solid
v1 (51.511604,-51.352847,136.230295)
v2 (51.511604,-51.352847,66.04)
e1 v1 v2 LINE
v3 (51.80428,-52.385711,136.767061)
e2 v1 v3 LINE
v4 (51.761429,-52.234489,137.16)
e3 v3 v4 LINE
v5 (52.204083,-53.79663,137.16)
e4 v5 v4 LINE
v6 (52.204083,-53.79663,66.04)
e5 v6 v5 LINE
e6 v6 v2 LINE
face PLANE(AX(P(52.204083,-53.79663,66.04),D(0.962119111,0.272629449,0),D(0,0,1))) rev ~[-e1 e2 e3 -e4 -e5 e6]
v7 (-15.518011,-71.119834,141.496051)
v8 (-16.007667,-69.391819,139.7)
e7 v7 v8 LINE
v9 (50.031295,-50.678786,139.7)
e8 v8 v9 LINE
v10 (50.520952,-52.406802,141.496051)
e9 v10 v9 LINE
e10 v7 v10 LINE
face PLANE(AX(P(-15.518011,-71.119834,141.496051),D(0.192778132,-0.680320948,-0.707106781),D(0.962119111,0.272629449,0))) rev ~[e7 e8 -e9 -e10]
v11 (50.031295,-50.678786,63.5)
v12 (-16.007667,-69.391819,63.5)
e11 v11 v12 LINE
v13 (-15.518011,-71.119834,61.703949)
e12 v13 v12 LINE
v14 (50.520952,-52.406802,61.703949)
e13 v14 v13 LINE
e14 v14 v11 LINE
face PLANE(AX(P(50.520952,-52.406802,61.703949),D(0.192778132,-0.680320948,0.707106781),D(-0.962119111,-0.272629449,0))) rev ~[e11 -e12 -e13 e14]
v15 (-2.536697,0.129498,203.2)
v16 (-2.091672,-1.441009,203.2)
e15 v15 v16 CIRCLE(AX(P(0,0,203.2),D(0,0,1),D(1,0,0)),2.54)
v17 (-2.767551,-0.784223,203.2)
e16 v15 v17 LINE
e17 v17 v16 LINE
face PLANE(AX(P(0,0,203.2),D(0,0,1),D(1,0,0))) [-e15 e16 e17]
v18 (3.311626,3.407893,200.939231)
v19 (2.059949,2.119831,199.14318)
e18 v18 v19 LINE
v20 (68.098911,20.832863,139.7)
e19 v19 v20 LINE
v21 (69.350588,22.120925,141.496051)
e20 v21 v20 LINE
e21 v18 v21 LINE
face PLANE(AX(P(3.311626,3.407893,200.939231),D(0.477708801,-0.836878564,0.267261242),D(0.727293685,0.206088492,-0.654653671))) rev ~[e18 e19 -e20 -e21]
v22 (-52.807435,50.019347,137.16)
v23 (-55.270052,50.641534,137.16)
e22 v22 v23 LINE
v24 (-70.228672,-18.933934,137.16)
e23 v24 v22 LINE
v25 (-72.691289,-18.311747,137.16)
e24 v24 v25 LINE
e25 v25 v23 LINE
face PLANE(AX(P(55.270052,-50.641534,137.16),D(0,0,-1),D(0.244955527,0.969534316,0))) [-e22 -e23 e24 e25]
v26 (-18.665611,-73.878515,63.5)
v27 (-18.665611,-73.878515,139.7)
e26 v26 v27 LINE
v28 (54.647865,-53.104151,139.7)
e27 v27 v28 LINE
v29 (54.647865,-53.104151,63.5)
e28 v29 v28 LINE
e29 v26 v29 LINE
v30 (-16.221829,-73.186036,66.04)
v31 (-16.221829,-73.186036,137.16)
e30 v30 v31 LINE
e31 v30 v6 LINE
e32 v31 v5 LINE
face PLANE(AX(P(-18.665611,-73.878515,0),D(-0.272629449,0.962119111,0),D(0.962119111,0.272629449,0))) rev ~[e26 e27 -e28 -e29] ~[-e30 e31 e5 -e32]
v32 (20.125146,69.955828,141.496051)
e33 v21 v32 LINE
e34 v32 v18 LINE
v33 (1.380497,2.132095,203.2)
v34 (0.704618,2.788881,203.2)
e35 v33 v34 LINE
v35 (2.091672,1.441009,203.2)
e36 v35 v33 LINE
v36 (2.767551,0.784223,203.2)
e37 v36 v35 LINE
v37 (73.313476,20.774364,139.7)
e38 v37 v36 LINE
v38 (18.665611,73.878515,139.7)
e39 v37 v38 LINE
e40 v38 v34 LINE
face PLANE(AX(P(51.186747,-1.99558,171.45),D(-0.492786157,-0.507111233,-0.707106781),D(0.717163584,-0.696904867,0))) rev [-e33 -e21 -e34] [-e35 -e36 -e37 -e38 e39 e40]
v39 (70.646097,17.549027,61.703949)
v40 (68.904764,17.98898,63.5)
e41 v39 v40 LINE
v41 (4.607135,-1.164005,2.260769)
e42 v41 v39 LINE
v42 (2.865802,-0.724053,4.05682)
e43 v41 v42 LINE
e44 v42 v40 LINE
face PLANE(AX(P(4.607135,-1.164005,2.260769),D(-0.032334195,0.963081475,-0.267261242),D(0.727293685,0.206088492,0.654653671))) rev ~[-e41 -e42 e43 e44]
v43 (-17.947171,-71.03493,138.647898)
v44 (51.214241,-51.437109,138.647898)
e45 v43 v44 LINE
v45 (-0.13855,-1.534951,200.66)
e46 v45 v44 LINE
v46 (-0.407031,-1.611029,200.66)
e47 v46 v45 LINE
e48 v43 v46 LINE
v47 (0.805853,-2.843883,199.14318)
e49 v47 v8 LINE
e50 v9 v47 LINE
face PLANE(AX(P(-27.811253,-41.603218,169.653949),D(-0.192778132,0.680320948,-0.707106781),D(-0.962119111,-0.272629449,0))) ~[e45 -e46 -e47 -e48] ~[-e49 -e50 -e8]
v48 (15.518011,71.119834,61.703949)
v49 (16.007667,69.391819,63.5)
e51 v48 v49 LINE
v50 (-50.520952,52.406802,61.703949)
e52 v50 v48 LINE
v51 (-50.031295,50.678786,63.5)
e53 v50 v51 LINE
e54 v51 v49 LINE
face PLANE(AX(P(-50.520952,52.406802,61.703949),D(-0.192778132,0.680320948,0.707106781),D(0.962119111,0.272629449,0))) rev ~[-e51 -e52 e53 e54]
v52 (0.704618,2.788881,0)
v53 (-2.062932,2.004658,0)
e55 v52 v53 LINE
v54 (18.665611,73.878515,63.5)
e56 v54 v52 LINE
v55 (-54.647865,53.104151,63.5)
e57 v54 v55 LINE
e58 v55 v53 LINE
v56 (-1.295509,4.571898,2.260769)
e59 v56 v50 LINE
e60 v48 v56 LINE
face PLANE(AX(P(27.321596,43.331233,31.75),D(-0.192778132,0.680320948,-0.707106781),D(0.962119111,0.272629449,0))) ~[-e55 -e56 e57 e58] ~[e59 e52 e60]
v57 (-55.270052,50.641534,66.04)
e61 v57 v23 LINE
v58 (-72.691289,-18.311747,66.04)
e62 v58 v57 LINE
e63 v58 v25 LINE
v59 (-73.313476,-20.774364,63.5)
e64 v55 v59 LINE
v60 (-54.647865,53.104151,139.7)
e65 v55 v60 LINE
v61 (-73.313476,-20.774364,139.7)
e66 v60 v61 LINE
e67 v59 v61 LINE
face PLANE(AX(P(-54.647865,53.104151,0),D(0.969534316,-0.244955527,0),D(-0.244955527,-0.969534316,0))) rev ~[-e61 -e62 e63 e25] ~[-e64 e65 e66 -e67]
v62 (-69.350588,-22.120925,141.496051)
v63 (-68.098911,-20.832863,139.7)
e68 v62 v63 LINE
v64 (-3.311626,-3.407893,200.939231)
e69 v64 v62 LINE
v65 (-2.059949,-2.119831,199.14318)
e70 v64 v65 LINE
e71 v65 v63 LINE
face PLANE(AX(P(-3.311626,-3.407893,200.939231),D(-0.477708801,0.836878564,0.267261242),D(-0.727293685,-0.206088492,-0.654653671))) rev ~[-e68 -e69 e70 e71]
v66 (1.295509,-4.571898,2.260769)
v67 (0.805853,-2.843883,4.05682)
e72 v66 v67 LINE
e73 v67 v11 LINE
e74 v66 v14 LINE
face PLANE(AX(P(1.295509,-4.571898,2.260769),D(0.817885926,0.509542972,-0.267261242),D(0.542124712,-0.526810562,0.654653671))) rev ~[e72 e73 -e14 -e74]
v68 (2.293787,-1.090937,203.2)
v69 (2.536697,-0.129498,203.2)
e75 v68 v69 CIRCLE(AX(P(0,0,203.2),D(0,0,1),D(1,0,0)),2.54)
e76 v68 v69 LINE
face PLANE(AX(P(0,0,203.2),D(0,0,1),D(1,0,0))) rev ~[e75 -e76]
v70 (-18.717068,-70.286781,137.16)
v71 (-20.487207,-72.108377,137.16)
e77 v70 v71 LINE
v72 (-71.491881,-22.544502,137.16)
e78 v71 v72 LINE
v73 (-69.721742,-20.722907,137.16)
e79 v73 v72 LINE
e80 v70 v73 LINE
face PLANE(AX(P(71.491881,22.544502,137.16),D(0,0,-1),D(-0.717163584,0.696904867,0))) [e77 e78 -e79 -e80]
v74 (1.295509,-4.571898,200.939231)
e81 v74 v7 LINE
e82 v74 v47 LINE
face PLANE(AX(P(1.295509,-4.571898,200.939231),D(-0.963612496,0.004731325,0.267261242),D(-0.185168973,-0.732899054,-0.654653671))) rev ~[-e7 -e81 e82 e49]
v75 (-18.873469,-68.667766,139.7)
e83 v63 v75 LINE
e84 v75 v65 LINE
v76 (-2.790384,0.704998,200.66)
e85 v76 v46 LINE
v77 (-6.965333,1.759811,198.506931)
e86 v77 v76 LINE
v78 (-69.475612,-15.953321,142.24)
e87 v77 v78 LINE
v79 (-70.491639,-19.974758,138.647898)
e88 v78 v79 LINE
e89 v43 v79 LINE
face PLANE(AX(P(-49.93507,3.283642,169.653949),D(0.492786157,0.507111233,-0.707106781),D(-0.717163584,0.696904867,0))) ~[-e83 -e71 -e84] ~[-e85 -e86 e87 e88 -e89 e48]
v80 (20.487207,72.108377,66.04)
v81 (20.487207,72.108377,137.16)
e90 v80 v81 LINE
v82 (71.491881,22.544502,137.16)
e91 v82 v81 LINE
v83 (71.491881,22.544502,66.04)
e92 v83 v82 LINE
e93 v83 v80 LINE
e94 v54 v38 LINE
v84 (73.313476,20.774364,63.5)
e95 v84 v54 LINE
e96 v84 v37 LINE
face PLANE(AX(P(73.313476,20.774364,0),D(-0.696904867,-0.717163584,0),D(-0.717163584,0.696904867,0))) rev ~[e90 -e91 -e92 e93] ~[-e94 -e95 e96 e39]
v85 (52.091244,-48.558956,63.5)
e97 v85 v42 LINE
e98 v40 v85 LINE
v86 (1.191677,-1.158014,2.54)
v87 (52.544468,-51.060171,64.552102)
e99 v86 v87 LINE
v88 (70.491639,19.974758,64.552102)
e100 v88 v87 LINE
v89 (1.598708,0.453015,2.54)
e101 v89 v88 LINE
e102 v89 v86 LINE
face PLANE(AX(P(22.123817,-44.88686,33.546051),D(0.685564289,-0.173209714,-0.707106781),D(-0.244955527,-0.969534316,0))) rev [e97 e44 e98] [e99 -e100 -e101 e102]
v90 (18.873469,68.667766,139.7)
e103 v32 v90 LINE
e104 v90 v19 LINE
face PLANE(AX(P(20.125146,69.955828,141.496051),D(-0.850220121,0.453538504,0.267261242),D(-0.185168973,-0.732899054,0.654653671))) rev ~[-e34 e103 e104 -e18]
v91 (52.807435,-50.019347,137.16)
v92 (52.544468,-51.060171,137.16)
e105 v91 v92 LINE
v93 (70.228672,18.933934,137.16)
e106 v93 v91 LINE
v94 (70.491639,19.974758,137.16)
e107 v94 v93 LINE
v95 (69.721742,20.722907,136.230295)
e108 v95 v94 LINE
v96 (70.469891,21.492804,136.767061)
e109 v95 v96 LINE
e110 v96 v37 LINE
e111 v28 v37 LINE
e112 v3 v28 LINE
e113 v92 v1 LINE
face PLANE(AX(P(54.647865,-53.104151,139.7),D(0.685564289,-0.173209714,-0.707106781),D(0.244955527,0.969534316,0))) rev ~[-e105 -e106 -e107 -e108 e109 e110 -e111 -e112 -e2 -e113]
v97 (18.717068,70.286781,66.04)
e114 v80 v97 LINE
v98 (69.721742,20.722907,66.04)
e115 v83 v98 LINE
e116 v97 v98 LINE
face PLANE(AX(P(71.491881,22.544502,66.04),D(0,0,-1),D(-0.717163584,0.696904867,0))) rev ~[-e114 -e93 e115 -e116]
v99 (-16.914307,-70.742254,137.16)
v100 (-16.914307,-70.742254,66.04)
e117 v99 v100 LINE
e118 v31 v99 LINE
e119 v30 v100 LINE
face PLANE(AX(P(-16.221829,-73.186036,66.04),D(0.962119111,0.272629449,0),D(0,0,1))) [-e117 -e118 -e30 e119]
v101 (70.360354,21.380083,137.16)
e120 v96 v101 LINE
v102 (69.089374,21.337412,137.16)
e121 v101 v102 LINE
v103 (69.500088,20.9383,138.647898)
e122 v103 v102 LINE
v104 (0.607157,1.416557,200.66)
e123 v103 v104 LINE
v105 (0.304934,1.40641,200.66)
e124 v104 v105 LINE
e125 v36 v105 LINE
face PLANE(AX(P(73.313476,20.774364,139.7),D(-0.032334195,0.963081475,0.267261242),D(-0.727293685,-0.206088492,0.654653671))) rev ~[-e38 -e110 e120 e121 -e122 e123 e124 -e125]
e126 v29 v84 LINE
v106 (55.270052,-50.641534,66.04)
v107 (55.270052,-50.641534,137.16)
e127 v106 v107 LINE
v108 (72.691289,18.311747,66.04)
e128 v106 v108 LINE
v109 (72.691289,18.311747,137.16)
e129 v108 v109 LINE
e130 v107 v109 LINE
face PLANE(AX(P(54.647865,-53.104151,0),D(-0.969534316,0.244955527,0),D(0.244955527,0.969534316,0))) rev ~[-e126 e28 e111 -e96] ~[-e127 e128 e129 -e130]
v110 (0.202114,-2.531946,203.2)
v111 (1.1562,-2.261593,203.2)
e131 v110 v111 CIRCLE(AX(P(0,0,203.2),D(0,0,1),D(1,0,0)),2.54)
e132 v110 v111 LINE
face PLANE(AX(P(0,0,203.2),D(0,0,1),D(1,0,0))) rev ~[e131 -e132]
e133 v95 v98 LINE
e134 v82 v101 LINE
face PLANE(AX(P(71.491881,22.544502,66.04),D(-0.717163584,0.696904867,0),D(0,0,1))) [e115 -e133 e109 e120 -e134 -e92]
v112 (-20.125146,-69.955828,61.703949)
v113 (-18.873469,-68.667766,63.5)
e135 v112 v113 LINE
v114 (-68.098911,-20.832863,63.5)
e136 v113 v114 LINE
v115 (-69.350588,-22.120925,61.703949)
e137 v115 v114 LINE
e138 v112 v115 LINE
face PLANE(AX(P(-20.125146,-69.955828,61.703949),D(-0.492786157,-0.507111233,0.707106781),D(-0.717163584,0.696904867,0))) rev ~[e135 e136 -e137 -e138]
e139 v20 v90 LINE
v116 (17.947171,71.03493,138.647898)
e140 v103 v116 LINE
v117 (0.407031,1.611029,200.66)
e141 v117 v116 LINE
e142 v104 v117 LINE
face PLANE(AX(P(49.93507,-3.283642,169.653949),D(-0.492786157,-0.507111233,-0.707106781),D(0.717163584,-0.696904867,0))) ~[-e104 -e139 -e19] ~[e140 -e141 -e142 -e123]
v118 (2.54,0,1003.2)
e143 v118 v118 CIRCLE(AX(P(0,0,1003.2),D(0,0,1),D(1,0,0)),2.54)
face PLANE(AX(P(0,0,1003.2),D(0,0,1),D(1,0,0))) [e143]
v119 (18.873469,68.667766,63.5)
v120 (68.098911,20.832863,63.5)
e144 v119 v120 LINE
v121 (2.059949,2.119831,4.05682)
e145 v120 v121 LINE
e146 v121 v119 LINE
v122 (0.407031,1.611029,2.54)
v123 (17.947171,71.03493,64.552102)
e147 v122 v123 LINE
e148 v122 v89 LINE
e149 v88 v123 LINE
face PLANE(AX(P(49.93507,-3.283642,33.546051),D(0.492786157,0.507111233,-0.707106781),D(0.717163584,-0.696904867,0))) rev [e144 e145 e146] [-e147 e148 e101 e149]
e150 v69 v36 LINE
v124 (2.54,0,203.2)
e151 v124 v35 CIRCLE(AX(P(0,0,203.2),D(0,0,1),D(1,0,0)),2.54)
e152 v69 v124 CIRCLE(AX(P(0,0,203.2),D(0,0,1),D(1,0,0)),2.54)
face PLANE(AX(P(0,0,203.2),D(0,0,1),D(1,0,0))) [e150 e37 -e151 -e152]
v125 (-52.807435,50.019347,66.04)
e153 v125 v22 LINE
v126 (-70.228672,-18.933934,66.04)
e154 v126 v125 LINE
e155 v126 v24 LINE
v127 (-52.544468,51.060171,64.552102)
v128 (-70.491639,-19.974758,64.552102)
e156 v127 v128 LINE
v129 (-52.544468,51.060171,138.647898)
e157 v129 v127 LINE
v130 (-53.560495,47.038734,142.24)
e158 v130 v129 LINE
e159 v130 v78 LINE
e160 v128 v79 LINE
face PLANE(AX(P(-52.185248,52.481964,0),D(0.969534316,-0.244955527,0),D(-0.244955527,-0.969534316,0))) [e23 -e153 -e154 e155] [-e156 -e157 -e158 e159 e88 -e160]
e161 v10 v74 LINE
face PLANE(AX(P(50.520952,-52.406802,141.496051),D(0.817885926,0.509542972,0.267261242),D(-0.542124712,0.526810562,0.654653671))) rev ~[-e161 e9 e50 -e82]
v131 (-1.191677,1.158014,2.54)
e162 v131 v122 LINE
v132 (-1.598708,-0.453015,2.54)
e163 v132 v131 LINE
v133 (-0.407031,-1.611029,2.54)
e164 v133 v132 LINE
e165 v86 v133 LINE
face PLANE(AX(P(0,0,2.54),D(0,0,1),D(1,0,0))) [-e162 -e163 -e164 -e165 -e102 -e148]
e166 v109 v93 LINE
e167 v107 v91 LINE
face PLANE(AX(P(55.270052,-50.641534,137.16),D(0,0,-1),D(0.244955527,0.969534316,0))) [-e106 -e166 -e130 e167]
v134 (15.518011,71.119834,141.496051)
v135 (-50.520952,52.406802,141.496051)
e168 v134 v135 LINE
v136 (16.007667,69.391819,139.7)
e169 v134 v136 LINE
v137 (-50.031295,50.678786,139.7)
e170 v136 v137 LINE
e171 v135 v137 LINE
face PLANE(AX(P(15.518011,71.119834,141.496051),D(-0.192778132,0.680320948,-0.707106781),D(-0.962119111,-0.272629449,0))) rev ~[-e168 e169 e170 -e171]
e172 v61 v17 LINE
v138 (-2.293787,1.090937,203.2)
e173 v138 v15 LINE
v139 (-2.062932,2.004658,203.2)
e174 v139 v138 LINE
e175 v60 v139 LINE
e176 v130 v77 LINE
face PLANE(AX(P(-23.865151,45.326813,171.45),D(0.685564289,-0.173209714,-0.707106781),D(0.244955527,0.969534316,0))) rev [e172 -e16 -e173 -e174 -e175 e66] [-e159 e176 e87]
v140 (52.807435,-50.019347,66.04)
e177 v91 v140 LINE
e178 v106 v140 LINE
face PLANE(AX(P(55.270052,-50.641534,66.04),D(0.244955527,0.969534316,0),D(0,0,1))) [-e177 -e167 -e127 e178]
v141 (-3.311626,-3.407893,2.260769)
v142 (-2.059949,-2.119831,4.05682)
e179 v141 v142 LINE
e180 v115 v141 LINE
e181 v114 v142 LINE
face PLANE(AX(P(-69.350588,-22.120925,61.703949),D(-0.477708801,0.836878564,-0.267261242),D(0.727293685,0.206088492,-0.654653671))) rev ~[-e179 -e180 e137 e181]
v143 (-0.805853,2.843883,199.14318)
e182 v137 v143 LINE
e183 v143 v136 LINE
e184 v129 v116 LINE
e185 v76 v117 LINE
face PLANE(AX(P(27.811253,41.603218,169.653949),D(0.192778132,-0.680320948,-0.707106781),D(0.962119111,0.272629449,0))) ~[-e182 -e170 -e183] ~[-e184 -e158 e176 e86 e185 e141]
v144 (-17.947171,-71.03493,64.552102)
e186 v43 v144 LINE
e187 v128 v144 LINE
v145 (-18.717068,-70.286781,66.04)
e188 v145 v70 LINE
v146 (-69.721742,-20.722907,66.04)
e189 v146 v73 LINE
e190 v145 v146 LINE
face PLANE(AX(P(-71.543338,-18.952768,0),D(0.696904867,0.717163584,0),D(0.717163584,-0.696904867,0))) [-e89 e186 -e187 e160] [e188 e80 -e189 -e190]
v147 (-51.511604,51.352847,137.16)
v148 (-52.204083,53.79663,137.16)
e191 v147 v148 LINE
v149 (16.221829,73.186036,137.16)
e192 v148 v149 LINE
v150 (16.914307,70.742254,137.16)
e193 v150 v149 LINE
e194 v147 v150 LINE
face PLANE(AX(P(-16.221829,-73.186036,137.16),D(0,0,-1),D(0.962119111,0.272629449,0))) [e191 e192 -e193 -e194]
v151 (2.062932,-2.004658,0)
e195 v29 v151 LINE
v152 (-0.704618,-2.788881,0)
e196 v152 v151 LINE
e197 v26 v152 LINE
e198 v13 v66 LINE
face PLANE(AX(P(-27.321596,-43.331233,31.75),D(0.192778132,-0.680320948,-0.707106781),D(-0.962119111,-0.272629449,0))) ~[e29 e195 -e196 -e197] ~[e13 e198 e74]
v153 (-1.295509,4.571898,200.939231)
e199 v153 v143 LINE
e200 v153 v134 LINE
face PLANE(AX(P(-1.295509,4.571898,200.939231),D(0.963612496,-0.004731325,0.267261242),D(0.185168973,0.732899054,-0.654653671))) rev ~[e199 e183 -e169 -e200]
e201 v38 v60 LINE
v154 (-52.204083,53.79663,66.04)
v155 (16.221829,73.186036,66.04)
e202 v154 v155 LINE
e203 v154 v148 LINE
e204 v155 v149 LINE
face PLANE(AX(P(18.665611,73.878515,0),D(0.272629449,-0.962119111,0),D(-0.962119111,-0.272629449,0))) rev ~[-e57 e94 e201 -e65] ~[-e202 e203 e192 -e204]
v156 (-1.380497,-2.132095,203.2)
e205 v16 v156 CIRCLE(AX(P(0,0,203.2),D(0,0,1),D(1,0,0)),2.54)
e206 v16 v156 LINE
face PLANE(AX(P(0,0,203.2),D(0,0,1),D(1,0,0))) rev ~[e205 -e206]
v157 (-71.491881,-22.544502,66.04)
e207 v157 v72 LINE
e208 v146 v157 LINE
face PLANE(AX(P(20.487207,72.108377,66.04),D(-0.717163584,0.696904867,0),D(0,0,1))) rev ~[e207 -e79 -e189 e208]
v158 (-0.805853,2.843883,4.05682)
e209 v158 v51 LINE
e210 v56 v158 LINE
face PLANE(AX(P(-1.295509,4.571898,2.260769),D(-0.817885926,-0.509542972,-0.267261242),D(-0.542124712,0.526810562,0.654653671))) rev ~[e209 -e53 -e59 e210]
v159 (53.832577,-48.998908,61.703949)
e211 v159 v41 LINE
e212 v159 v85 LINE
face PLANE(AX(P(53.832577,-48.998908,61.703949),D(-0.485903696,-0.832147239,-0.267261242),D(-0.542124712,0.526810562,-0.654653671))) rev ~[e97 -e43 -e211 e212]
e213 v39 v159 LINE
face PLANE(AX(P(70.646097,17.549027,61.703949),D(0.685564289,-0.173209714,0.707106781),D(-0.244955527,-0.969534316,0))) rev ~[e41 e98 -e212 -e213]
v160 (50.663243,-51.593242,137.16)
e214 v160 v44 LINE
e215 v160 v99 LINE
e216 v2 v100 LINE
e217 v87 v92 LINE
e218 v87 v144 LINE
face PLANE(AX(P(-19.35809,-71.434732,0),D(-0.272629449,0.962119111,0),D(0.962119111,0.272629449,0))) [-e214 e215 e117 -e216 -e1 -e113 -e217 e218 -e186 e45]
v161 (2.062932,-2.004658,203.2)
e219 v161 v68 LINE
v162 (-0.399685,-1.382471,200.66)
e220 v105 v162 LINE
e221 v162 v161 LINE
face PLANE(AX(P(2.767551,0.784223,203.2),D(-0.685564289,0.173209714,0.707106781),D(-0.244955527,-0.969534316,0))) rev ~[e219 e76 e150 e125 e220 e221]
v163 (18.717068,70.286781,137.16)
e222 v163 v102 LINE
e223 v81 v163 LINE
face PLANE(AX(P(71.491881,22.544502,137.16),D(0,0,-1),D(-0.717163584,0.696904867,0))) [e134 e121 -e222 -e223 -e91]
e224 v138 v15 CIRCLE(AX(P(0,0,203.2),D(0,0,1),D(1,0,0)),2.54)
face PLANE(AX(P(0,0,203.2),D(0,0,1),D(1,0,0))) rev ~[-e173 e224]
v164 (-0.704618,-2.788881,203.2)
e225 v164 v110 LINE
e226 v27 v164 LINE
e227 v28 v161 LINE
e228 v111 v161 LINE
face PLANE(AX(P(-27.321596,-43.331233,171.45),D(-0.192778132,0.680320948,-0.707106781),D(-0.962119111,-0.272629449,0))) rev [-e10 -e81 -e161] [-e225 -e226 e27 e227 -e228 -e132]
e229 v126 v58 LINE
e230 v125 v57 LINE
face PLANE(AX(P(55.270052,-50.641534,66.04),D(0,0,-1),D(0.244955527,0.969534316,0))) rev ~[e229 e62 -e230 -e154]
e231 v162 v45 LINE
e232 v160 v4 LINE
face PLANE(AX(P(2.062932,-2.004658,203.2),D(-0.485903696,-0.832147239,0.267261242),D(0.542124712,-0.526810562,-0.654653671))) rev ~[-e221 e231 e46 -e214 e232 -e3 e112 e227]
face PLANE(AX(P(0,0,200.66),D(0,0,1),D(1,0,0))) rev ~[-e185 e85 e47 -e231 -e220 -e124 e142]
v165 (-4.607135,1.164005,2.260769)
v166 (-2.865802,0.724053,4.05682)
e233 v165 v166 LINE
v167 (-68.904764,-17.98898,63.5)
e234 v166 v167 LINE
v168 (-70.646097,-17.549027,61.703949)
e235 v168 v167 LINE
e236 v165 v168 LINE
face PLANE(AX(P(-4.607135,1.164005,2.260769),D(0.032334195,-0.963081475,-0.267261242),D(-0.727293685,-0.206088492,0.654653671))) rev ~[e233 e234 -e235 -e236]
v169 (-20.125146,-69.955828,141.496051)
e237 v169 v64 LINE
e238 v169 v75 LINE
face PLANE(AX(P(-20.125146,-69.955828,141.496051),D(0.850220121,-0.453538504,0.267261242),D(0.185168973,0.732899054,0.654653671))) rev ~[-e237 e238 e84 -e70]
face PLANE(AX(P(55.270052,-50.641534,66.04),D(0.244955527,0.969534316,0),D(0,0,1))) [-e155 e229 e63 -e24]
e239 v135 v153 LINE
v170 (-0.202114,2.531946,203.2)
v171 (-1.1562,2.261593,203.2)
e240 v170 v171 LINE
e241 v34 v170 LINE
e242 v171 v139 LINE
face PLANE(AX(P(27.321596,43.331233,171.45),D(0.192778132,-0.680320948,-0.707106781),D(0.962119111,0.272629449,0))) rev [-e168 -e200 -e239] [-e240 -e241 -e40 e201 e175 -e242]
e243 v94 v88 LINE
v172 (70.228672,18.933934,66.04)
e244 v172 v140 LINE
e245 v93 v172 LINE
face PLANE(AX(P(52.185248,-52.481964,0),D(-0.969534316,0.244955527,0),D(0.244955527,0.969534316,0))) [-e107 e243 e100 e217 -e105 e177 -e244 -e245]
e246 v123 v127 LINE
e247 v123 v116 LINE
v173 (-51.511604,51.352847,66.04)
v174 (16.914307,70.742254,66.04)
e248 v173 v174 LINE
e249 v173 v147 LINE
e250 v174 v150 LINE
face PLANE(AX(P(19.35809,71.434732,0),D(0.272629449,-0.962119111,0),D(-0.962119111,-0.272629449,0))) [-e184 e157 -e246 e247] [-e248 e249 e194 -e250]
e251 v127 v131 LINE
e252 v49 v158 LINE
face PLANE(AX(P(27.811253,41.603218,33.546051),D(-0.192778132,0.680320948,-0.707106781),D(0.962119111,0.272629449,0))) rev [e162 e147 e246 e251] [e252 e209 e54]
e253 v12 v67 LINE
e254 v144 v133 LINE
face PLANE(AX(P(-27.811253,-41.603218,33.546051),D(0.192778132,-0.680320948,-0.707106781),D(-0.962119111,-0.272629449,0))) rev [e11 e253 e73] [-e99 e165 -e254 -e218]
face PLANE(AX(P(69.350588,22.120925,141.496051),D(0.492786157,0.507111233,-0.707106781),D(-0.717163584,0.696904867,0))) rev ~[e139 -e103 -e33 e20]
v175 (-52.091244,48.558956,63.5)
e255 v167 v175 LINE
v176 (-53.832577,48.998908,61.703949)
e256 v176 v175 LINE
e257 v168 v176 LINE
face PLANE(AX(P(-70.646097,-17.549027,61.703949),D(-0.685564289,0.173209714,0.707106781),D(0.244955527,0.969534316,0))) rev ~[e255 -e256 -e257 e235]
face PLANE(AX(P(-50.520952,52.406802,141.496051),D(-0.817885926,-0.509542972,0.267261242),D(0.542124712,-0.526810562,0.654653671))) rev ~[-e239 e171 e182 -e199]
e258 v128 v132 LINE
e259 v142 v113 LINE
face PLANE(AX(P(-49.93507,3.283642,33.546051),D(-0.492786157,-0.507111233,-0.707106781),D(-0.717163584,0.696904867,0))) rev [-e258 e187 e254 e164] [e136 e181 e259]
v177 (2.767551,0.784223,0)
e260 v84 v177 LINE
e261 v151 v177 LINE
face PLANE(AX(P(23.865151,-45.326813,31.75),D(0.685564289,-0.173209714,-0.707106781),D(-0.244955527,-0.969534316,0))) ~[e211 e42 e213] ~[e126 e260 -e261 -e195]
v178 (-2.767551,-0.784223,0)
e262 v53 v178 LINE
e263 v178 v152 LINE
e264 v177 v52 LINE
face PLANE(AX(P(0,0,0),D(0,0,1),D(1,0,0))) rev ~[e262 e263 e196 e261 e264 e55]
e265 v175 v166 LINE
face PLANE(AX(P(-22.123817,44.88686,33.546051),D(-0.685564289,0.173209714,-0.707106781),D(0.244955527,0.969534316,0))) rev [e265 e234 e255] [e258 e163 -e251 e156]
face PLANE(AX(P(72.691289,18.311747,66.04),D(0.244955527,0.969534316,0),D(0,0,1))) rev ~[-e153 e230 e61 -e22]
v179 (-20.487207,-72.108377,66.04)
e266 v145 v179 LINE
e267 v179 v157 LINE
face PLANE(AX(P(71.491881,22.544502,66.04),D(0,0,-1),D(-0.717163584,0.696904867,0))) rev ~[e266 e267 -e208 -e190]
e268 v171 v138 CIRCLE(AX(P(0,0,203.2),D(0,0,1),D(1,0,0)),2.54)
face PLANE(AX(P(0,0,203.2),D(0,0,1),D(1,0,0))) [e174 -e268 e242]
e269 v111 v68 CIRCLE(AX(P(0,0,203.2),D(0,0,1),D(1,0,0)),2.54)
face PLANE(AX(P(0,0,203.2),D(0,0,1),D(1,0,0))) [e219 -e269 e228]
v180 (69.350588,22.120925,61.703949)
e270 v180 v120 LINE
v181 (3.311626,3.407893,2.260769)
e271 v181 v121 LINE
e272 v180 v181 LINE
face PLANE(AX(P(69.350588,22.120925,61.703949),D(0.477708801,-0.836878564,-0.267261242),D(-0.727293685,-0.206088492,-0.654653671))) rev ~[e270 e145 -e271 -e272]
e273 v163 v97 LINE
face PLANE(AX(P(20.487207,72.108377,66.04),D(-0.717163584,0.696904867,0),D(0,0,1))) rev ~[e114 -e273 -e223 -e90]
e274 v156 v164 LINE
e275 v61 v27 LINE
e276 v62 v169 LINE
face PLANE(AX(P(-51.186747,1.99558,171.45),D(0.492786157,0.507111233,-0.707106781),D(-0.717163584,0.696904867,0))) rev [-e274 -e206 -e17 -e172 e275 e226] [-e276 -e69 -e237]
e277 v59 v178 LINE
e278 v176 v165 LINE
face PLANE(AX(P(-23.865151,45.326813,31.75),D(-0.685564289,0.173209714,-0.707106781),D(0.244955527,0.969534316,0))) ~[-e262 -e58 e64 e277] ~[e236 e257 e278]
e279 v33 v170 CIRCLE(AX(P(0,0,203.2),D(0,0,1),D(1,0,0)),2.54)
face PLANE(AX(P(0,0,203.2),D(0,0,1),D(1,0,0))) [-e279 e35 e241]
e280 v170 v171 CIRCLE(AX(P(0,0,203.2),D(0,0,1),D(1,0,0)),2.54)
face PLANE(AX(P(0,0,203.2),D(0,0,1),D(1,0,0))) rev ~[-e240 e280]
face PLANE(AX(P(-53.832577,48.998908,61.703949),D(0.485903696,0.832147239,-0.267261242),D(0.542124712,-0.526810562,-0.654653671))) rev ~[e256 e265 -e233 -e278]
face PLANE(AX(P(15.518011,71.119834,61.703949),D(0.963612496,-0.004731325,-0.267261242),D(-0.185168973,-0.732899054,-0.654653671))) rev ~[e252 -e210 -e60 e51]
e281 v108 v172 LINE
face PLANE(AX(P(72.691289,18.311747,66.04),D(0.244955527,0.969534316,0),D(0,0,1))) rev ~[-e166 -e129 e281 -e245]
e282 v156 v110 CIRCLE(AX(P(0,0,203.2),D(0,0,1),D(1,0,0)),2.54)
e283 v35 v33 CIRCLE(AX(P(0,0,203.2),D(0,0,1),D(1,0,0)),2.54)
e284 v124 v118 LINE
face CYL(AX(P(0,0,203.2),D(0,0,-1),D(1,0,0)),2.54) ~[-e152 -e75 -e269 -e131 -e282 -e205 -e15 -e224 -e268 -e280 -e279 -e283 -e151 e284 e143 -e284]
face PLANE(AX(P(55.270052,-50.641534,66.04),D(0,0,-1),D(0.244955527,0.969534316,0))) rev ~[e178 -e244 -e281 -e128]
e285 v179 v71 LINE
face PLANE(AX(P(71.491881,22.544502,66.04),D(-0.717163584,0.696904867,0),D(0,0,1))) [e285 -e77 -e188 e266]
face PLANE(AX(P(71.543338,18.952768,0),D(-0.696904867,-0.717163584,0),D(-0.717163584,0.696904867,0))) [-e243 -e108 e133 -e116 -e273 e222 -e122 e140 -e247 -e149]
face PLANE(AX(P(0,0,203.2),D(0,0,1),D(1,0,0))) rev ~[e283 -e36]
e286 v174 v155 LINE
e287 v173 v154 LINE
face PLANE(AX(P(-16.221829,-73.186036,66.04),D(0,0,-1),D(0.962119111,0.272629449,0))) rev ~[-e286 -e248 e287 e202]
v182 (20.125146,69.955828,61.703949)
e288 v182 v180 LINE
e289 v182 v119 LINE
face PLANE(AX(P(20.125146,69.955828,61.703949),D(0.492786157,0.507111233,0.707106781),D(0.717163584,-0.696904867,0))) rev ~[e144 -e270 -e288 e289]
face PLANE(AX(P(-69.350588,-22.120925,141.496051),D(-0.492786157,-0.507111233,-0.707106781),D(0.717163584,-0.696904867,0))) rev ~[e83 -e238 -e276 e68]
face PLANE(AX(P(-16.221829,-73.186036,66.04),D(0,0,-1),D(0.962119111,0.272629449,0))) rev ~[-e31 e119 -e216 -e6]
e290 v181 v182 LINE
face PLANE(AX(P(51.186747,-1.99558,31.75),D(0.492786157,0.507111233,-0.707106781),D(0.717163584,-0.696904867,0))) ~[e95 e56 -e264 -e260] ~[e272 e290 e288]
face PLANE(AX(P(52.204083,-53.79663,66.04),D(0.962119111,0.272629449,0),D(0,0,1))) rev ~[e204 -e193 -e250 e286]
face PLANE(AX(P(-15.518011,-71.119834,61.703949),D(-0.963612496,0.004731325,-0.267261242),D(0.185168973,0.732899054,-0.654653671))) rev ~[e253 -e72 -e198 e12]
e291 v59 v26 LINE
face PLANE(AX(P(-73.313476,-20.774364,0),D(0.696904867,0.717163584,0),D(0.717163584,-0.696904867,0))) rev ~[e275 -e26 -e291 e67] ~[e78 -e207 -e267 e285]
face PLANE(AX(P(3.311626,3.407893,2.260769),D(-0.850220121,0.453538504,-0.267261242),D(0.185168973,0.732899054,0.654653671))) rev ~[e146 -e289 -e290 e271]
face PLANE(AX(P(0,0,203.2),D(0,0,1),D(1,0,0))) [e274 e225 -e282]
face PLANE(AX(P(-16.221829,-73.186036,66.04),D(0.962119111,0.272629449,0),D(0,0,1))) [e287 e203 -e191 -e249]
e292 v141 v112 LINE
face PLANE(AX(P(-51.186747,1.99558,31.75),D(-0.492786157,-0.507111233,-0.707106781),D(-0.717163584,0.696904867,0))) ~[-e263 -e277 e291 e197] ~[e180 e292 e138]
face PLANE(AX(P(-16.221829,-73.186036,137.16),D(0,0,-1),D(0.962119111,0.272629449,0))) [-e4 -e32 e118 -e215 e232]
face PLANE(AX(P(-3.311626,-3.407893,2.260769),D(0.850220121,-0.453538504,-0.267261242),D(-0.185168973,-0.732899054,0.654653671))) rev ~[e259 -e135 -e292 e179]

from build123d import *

# Parameters (mm, degrees)
F1_DEPTH  = 203.2
F2_SIZE   = 63.5
F3_T      = -2.54
F5_DEPTH  = 2.54
F7_DEPTH  = 2.54
F9_DEPTH  = 7.1852048969
F10_DEPTH = 2.541
F12_DEPTH = 2.54
F14_DEPTH = 2.54
F15_W     = 71.12
F15_H     = 71.12
F16_DEPTH = 157.0594794416
F17_W     = 71.12
F17_H     = 71.12
F18_DEPTH = 155.1690173594
F19_W     = 71.12
F19_H     = 71.12
F20_DEPTH = 170.067634702
F22_DEPTH = 2.54
F24_DEPTH = 2.54
F26_DEPTH = 2.54
F28_DEPTH = 2.54
F30_DEPTH = 2.54
F32_DEPTH = 2.54
F33_R     = 2.54
F34_DEPTH = 800


# Not quite as in the source:
# - a feature names something its author has since deleted; it is built from what else it names


with BuildPart() as f1:
    # F0 (on Top) → F1 (new body)
    with BuildSketch(Plane.XY):
        Polygon((73.3134762531, 20.774364002), (18.6656111534, 73.8785148759), (-54.6478650997, 53.104150874), (-73.3134762531, -20.774364002), (-18.6656111534, -73.8785148759), (54.6478650997, -53.104150874), align=None)
    extrude(amount=F1_DEPTH)

    # F2
    f2_edges = [f1.edges().sort_by_distance(p)[0] for p in [
        (45.989544, 47.326439, 203.2),
        (-17.991127, 63.491333, 203.2),
        (-63.980671, 16.164893, 203.2),
        (-45.989544, -47.326439, 203.2),
        (17.991127, -63.491333, 203.2),
        (63.980671, -16.164893, 203.2),
        (45.989544, 47.326439, 0),
        (-17.991127, 63.491333, 0),
        (-63.980671, 16.164893, 0),
        (-45.989544, -47.326439, 0),
        (17.991127, -63.491333, 0),
        (63.980671, -16.164893, 0),
    ]]
    chamfer(f2_edges, length=F2_SIZE)

    # F3
    f3_openings = [f1.faces().sort_by_distance(p)[0] for p in [
        (-42.712352, 10.791394, 161.636633),
    ]]
    offset(amount=F3_T, openings=f3_openings)

    # F4 (on face) → F5 (cut, through all)
    with BuildSketch(Plane(origin=(-71.6735768194, -73.7570960609, 102.8455678842), x_dir=(0.8701504485, -0.287188723, 0.4004507889), z_dir=(-0.4927861574, -0.5071112335, 0.7071067812))):
        Polygon((2.6696402664, 64.4858378393), (59.2408259088, 25.6139572621), (78.5633694658, 114.3351670347), align=None)
    extrude(amount=-F5_DEPTH, mode=Mode.SUBTRACT)

    # F6 (on face) → F7 (cut, through all)
    with BuildSketch(Plane(origin=(28.0387304884, -98.9496863361, 102.8455678842), x_dir=(0.9812423716, 0.1336581106, -0.1389205444), z_dir=(0.192778132, -0.6803209476, 0.7071067812))):
        Polygon((-44.3893807317, 46.8522479636), (22.9119959884, 60.3373077027), (-27.2544501276, 136.0217938087), align=None)
    extrude(amount=-F7_DEPTH, mode=Mode.SUBTRACT)

    # F8 (on face) → F9 (cut, through all)
    with BuildSketch(Plane(origin=(99.7123073078, -25.1925902753, 102.8455678842), x_dir=(0.7280120913, 0.1631104703, -0.6658778937), z_dir=(0.6855642894, -0.1732097142, 0.7071067812))):
        Polygon((-133.1636625665, 49.1073482105), (-134.131528973, 46.3985518281), (-61.9006782251, -18.3416021227), (-36.2615283041, 53.4154462512), align=None)
        Polygon((-63.0205602981, -13.9269250267), (-130.6368034196, 46.6771789529), (-39.925449456, 50.7100458165), align=None, mode=Mode.SUBTRACT)
    extrude(amount=-F9_DEPTH, mode=Mode.SUBTRACT)

    # F8 (on face) + F2_face2 (on face) → F10 (cut, through all)
    with BuildSketch(Plane(origin=(99.7123073078, -25.1925902753, 102.8455678842), x_dir=(0.7280120913, 0.1631104703, -0.6658778937), z_dir=(0.6855642894, -0.1732097142, 0.7071067812))):
        Polygon((-133.1636625665, 49.1073482105), (-134.131528973, 46.3985518281), (-61.9006782251, -18.3416021227), (-36.2615283041, 53.4154462512), align=None)
        Polygon((-63.0205602981, -13.9269250267), (-130.6368034196, 46.6771789529), (-39.925449456, 50.7100458165), align=None, mode=Mode.SUBTRACT)
    with BuildSketch(Plane(origin=(42.71235225, -10.7913939511, 161.636632955), x_dir=(0.2449555269, 0.969534316, 0), z_dir=(0.6855642894, -0.1732097142, 0.7071067812))):
        Polygon((-34.3195357799, -28.4830838377), (34.3195357799, -28.4830838377), (0, 55.5822670322), align=None)
    extrude(amount=-F10_DEPTH, mode=Mode.SUBTRACT)

    # F11 (on face) → F12 (cut, through all)
    with BuildSketch(Plane(origin=(71.6735768194, 73.7570960609, 102.8455678842), x_dir=(0.8701504485, -0.287188723, -0.4004507889), z_dir=(0.4927861574, 0.5071112335, 0.7071067812))):
        Polygon((-59.2408259088, -25.6139572621), (-78.5633694658, -114.3351670347), (-2.6696402664, -64.4858378393), align=None)
    extrude(amount=-F12_DEPTH, mode=Mode.SUBTRACT)

    # F13 (on face) → F14 (cut, through all)
    with BuildSketch(Plane(origin=(-28.0387304884, 98.9496863361, 102.8455678842), x_dir=(0.9812423716, 0.1336581106, 0.1389205444), z_dir=(-0.192778132, 0.6803209476, 0.7071067812))):
        Polygon((44.3893807317, -46.8522479636), (-22.9119959884, -60.3373077027), (27.2544501276, -136.0217938087), align=None)
    extrude(amount=-F14_DEPTH, mode=Mode.SUBTRACT)

    # F15 (on face) → F16 (cut, through all)
    with BuildSketch(Plane(origin=(17.9911269732, -63.4913328749, 0), x_dir=(0.9621191109, 0.2726294488, 0), z_dir=(0.2726294488, -0.9621191109, 0))):
        with Locations((0, 101.6)):
            Rectangle(F15_W, F15_H)
    extrude(amount=-F16_DEPTH, mode=Mode.SUBTRACT)

    # F17 (on face) → F18 (cut, through all)
    with BuildSketch(Plane(origin=(63.9806706764, -16.164893436, 0), x_dir=(0.2449555269, 0.969534316, 0), z_dir=(0.969534316, -0.2449555269, 0))):
        with Locations((0, 101.6)):
            Rectangle(F17_W, F17_H)
    extrude(amount=-F18_DEPTH, mode=Mode.SUBTRACT)

    # F19 (on face) → F20 (cut, through all)
    with BuildSketch(Plane(origin=(45.9895437032, 47.3264394389, 0), x_dir=(-0.717163584, 0.6969048671, 0), z_dir=(0.6969048671, 0.717163584, 0))):
        with Locations((0, 101.6)):
            Rectangle(F19_W, F19_H)
    extrude(amount=-F20_DEPTH, mode=Mode.SUBTRACT)

    # F21 (on face) → F22 (cut, through all)
    with BuildSketch(Plane(origin=(1.2076208066, -0.3051087374, -1.2455678842), x_dir=(0.7280120913, 0.1631104703, 0.6658778937), z_dir=(0.6855642894, -0.1732097142, -0.7071067812))):
        Polygon((95.3809385521, -2.3644010884), (72.2858277101, 62.2725697547), (4.6695845886, 1.6684657751), align=None)
    extrude(amount=-F22_DEPTH, mode=Mode.SUBTRACT)

    # F23 (on face) → F24 (cut, through all)
    with BuildSketch(Plane(origin=(0.8680423208, 0.8932759279, -1.2455678842), x_dir=(0.8701504485, -0.287188723, 0.4004507889), z_dir=(0.4927861574, 0.5071112335, -0.7071067812))):
        Polygon((22.13077439, -92.8080958564), (78.7019600324, -53.9362152793), (2.808230833, -4.0868860838), align=None)
    extrude(amount=-F24_DEPTH, mode=Mode.SUBTRACT)

    # F25 (on face) → F26 (cut, through all)
    with BuildSketch(Plane(origin=(-0.3395784858, 1.1983846653, -1.2455678842), x_dir=(0.9812423716, 0.1336581106, -0.1389205444), z_dir=(-0.192778132, 0.6803209476, -0.7071067812))):
        Polygon((16.1607261154, -94.0316157631), (-0.9742044888, -4.862069918), (-51.1406506047, -80.546556024), align=None)
    extrude(amount=-F26_DEPTH, mode=Mode.SUBTRACT)

    # F27 (on face) → F28 (cut, through all)
    with BuildSketch(Plane(origin=(-1.2076208066, 0.3051087374, -1.2455678842), x_dir=(0.7280120913, 0.1631104703, -0.6658778937), z_dir=(-0.6855642894, 0.1732097142, -0.7071067812))):
        Polygon((-72.2858277101, -62.2725697547), (-4.6695845886, -1.6684657751), (-95.3809385521, 2.3644010884), align=None)
    extrude(amount=-F28_DEPTH, mode=Mode.SUBTRACT)

    # F29 (on face) → F30 (cut, through all)
    with BuildSketch(Plane(origin=(-0.8680423208, -0.8932759279, -1.2455678842), x_dir=(0.8701504485, -0.287188723, -0.4004507889), z_dir=(-0.4927861574, -0.5071112335, -0.7071067812))):
        Polygon((-78.7019600324, 53.9362152793), (-2.808230833, 4.0868860838), (-22.13077439, 92.8080958564), align=None)
    extrude(amount=-F30_DEPTH, mode=Mode.SUBTRACT)

    # F31 (on face) → F32 (cut, through all)
    with BuildSketch(Plane(origin=(0.3395784858, -1.1983846653, -1.2455678842), x_dir=(0.9812423716, 0.1336581106, 0.1389205444), z_dir=(0.192778132, -0.6803209476, -0.7071067812))):
        Polygon((-16.1607261154, 94.0316157631), (0.9742044888, 4.862069918), (51.1406506047, 80.546556024), align=None)
    extrude(amount=-F32_DEPTH, mode=Mode.SUBTRACT)

    # F33 (on face) → F34 (join)
    with BuildSketch(Plane.XY.offset(203.2)):
        Circle(F33_R)
    extrude(amount=F34_DEPTH)


solid = f1.part
